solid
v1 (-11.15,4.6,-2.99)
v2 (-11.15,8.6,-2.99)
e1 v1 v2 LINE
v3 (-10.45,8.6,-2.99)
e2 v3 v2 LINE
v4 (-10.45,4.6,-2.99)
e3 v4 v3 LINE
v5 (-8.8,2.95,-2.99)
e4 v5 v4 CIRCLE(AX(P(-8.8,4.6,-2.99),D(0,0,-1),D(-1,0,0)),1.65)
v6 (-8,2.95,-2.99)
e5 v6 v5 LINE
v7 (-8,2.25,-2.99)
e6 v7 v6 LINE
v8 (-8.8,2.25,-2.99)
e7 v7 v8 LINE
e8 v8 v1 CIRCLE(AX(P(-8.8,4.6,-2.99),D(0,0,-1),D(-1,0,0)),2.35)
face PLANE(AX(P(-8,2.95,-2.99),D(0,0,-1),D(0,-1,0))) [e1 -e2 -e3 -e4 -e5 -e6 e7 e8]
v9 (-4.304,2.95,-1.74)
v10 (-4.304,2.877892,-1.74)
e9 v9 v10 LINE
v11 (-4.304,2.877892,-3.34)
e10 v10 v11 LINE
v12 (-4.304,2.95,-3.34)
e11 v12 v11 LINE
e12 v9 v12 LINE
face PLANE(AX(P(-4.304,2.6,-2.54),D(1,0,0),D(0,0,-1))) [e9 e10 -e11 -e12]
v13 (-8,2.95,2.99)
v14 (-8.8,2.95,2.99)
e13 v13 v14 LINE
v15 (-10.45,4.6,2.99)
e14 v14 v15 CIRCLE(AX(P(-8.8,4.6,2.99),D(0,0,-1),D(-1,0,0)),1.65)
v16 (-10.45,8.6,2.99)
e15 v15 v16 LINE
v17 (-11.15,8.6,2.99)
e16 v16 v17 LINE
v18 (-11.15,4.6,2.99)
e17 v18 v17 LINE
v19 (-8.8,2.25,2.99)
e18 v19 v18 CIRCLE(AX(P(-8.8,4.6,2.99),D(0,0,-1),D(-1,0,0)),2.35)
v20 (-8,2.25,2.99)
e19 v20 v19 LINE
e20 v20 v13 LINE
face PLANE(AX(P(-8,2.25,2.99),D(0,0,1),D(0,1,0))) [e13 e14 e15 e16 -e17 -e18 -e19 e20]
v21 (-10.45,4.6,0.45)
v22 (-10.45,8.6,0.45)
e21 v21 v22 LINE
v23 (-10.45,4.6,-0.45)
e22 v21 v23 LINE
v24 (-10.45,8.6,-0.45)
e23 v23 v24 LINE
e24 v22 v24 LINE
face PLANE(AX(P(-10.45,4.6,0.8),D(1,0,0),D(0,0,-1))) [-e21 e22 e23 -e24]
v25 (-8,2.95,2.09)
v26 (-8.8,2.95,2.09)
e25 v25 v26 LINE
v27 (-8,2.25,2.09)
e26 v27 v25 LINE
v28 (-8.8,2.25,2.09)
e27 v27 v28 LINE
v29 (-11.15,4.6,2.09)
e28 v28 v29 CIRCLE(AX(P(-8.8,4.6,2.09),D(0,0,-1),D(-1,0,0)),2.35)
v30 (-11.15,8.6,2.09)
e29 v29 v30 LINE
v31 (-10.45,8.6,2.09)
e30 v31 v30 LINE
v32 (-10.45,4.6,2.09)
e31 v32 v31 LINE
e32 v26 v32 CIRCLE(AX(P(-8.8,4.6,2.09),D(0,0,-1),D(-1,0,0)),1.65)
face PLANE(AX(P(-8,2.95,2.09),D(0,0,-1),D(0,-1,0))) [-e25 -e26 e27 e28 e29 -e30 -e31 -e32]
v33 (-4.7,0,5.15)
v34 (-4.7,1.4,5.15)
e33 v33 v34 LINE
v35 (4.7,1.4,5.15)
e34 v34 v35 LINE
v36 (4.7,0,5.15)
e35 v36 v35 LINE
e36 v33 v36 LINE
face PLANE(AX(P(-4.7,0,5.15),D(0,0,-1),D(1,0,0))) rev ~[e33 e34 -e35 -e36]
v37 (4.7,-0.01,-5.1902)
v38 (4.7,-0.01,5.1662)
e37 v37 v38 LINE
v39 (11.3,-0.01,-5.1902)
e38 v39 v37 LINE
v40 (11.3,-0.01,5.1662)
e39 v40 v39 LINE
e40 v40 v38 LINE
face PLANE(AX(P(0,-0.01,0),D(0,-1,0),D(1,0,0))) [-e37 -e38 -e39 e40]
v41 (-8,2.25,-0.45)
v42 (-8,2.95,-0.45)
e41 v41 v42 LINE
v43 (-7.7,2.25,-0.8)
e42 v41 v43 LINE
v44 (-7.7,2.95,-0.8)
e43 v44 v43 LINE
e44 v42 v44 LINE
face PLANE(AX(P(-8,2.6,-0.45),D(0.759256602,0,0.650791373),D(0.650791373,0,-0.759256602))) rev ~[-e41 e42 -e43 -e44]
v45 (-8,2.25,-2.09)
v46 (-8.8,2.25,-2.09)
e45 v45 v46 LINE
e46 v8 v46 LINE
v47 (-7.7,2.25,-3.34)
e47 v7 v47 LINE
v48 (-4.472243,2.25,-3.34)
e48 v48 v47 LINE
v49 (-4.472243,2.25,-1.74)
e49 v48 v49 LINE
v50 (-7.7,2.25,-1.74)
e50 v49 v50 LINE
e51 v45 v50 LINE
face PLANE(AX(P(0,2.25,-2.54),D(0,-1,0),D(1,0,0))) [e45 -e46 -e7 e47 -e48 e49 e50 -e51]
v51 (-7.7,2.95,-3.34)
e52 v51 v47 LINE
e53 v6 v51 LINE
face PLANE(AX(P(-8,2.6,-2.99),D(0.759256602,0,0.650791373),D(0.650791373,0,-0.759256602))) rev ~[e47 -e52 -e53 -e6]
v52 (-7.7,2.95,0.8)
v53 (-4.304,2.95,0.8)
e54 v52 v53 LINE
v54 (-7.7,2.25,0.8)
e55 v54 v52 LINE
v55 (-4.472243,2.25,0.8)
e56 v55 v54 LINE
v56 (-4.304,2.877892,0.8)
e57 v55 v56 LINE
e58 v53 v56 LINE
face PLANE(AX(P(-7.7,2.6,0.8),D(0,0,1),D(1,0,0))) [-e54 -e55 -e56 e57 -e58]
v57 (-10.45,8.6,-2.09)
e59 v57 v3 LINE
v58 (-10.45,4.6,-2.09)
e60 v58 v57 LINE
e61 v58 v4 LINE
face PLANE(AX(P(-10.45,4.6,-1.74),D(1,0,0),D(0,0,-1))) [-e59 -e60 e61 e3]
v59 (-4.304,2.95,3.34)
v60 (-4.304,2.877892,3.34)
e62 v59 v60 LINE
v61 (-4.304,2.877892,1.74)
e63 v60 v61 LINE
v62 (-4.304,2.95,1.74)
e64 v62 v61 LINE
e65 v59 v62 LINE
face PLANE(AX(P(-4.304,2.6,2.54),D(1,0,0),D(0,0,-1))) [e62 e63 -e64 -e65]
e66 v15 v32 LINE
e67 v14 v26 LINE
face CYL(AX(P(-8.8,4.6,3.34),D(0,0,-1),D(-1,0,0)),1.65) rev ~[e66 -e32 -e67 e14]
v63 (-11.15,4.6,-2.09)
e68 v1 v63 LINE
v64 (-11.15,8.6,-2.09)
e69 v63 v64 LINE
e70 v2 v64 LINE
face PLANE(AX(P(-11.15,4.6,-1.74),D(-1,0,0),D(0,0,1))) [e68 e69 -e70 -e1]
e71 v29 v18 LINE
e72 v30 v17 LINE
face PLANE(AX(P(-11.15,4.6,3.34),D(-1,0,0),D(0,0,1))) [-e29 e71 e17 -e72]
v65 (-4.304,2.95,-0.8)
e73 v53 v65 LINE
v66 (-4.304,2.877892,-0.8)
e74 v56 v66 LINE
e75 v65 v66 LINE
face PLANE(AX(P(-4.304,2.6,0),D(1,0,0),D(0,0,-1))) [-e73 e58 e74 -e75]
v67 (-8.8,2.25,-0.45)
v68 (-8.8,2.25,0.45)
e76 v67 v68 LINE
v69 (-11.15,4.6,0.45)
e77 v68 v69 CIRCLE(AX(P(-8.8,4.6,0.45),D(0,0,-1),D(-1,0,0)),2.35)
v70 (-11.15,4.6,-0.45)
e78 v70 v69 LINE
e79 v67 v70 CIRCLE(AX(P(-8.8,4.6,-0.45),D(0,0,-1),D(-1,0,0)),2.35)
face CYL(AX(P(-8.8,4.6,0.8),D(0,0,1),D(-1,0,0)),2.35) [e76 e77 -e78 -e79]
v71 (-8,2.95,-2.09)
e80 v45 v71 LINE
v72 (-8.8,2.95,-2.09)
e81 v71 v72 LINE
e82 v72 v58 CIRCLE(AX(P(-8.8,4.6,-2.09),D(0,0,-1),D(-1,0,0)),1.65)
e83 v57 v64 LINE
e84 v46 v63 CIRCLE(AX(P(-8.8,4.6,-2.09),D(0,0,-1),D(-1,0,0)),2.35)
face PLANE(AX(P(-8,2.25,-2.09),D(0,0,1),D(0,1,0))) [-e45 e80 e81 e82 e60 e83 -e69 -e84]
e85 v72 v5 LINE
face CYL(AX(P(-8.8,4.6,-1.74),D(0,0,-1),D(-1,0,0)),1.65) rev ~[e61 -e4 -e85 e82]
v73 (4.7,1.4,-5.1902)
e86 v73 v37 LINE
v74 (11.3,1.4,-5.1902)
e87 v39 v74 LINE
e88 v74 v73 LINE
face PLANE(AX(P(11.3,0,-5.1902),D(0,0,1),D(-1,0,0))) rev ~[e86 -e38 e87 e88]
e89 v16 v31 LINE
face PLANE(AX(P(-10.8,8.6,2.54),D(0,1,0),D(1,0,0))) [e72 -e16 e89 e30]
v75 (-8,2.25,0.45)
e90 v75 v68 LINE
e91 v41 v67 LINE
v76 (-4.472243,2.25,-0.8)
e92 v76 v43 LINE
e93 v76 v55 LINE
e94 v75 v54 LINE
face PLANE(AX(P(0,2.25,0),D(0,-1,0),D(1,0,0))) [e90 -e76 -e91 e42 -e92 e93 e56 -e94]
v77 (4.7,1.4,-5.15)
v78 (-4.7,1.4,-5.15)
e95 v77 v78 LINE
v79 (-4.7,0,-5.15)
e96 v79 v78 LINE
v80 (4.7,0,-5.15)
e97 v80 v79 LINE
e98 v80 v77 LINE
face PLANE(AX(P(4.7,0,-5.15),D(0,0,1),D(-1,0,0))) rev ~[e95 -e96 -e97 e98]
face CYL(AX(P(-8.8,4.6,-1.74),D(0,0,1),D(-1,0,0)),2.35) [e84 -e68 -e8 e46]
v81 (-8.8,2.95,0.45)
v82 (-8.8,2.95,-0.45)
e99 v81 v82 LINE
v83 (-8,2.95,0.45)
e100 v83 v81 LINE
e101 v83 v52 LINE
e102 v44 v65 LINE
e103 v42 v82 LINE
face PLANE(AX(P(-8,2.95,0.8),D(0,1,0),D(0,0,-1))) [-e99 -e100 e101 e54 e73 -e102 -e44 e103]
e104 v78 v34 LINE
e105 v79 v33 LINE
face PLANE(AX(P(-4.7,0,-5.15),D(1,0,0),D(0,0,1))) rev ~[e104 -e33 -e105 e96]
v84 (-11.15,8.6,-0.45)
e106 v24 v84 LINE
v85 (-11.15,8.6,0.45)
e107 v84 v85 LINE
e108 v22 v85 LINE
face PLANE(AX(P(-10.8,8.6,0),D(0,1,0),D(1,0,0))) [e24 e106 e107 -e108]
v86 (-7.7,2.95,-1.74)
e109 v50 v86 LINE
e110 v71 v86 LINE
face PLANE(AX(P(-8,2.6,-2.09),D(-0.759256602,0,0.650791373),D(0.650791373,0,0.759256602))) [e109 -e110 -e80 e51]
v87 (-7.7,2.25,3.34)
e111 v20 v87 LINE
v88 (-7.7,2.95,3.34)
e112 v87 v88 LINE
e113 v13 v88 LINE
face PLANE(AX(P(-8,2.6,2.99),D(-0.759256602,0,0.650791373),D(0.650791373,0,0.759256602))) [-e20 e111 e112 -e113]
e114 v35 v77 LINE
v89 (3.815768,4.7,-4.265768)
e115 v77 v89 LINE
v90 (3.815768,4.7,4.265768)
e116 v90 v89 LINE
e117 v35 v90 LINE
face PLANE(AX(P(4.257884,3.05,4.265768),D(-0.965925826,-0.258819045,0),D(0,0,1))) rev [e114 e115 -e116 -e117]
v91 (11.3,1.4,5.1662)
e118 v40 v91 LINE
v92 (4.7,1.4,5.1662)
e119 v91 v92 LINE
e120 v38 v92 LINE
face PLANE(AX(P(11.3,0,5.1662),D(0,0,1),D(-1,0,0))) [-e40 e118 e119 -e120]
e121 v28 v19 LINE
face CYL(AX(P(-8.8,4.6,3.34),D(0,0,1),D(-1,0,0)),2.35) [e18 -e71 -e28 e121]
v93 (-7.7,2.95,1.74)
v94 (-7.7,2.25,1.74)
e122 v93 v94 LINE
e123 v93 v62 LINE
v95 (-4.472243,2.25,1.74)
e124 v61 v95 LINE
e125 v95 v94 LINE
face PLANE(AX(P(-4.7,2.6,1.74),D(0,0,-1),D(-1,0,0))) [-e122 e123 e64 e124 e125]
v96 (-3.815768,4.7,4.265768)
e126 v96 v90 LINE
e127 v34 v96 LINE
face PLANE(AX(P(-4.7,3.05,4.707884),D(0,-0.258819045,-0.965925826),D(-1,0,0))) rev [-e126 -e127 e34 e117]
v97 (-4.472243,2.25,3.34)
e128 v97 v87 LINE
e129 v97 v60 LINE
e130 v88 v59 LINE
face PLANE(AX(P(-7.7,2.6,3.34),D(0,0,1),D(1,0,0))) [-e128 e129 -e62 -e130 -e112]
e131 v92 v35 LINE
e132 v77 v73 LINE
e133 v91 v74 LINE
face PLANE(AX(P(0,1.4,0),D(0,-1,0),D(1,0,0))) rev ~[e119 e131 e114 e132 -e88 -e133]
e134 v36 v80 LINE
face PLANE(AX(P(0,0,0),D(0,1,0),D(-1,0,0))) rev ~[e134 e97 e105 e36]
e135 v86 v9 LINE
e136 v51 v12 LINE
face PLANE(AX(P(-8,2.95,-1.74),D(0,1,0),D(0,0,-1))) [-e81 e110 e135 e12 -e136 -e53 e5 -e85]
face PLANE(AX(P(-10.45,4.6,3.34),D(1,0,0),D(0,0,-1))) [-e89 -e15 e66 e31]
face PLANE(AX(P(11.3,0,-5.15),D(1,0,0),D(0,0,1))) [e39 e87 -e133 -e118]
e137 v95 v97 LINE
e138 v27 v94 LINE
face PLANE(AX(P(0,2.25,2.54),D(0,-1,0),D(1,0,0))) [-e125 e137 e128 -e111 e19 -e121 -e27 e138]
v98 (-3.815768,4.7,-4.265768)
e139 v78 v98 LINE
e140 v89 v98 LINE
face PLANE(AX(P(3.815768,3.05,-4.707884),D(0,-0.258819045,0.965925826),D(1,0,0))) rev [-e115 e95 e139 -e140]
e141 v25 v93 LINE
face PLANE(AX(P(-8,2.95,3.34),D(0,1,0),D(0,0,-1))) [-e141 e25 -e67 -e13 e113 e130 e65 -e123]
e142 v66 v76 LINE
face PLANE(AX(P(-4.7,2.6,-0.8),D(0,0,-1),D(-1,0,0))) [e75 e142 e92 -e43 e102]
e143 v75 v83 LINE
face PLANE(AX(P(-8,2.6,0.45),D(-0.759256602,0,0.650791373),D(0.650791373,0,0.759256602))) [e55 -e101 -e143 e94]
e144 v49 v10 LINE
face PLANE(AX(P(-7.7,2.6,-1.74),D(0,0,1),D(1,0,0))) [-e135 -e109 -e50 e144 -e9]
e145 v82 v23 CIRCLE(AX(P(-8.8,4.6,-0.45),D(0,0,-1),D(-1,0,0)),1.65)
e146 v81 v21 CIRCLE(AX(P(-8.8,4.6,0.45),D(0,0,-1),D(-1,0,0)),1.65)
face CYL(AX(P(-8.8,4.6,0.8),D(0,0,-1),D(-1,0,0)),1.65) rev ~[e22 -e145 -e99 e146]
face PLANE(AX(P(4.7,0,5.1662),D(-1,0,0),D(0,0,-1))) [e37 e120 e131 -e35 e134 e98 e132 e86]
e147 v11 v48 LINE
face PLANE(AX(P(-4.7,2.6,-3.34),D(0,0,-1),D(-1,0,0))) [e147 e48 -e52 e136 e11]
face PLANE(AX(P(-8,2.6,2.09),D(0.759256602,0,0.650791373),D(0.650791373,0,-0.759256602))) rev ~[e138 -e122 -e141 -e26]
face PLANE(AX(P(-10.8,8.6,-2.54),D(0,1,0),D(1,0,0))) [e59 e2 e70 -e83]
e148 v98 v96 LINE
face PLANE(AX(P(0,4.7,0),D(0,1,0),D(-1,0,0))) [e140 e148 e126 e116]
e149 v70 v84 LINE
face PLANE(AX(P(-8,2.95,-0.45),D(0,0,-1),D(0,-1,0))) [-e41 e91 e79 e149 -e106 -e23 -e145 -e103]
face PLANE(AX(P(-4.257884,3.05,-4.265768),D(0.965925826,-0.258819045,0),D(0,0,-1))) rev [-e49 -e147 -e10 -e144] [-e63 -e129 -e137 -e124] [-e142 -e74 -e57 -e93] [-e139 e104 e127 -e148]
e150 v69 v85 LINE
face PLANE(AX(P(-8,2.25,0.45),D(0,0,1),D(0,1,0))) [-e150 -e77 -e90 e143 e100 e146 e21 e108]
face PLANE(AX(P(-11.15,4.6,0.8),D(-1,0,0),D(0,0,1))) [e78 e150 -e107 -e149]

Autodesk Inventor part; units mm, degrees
ref_plane "YZ Plane" through (0, 0, 0) normal (1, 0, 0) x (0, 1, 0)
ref_plane "XZ Plane" through (0, 0, 0) normal (0, 1, 0) x (-1, 0, 0)
sketch "Sketch1" plane through (0, 0, 0) normal (0, 1, 0) x (-1, 0, 0)
  line L0 (4.7, 5.15) -> (-4.7, 5.15)
  line L1 (-4.7, 5.15) -> (-4.7, -5.15)
  line L2 (-4.7, -5.15) -> (4.7, -5.15)
  line L3 (4.7, -5.15) -> (4.7, 5.15)
  point P0 (0, 0)
  dimension "d0" = 9.4
  dimension "d1" = 4.7
  dimension "d2" = 10.3
  dimension "d3" = 5.15
extrude "Extrusion1" add sketch "Sketch1" along normal blind 4.7
chamfer "Chamfer1" distance 3.3 angle 15 1 edges at (0, 4.7, 5.15) measured on face at (-1.5667, 1.5667, 5.15)
chamfer "Chamfer2" distance 3.3 angle 15 1 edges at (4.7, 4.7, -0.4421) measured on face at (4.7, 3.1333, -2.0114)
chamfer "Chamfer3" distance 3.3 angle 15 1 edges at (-0.4421, 4.7, -5.15) measured on face at (-1.8614, 3.1333, -5.15)
chamfer "Chamfer4" distance 3.3 angle 15 1 edges at (-4.7, 4.7, 0) measured on face at (-4.7, 2.5, -1.4219)
sketch "Sketch2" plane through (0, 0, 0) normal (0, -1, 0) x (1, 0, 0)
  line L0 (4.7, 5.15) -> (4.7, -5.15) projected
  line L1 (11.3, -5.15) -> (11.3, 5.1662)
  line L2 (11.3, 5.1662) -> (4.7, 5.1662)
  line L3 (4.7, 5.1662) -> (4.7, -5.15)
  line L4 (-4.7, 5.15) -> (4.7, 5.15) projected
  line L5 (11.3, -5.15) -> (11.3, -5.1902)
  line L6 (11.3, -5.1902) -> (4.7, -5.1902)
  line L7 (4.7, -5.1902) -> (4.7, -5.15)
  point P0 (0, 0)
  dimension "d18" = 6.6
extrude "Extrusion2" add sketch "Sketch2" against normal blind 1.4 and the other way blind 0.01
ref_plane "Work Plane1" through (0, 2.6, 0) normal (0, -1, 0) x (1, 0, 0)
sketch "Sketch3" plane through (0, 2.6, 0) normal (0, -1, 0) x (1, 0, 0)
  line L0 (-4.304, -0.8) -> (-8, -0.8)
  line L1 (-8, -0.8) -> (-8, 0.8)
  line L2 (-8, 0.8) -> (-4.304, 0.8)
  line L3 (-4.304, 0.8) -> (-4.304, -0.8)
  line L4 (-4.7, -5.15) -> (-4.7, 5.15) projected
  line L5 (-4.7, -5.15) -> (-4.7, 5.15) projected
  line L6 (-4.7, 0) -> (-3.1889, 0)
  line L7 (-8, -0.45) -> (-7.7, -0.8)
  line L8 (-8, 0.45) -> (-7.7, 0.8)
  point P0 (0, 0)
  dimension "d25" = 3.3
  dimension "d26" = 1.6
  dimension "d27" = 0.8
  dimension "d28" = 3
  dimension "d29" = 3
  dimension "d30" = 0.9
  dimension "d31" = 0.45
extrude "Extrusion3" add sketch "Sketch3" along normal mid plane 0.7 contours L7 L1 L8 L2 L4 L0 | L4 L6 L3 L0 | L4 L2 L3 L6
sketch "Sketch4" plane through (-8, 2.25, -0.45) normal (-1, 0, 0) x (0, 0, 1)
  line L0 (1.25, 0.7) -> (-0.35, 0.7) projected
  line L1 (1.25, 0) -> (-0.35, 0) projected
  line L2 (0.9, 0.7) -> (0, 0.7)
  line L3 (0, 0.7) -> (0, 0)
  line L4 (0, 0) -> (0.9, 0)
  line L5 (0.9, 0) -> (0.9, 0.7)
  line L6 (0.9, 0.7) -> (0.9, 0) projected
  line L7 (0.9, 0.126) -> (0.9, 0.1378)
  point P0 (0.45, -2.25)
  dimension "d34" = 0.9
  dimension "d35" = 0
sketch "Sketch5" plane through (0, 0, 0) normal (0, 0, 1) x (1, 0, 0)
  line L0 (-8, 2.95) -> (-8, 2.25) projected
  line L1 (-8, 2.6) -> (-8.8, 2.6)
  line L2 (-10.8, 4.6) -> (-10.8, 8.6)
  line L3 (-4.557, 8.6) -> (-13.8977, 8.6)
  line L4 (4.7, 0) -> (-4.7, 0) projected
  arc A0 (-10.8, 4.6) -> (-8.8, 2.6) centre (-8.8, 4.6) ccw
  point P0 (0, 0)
  dimension "d36" = 8.6
  dimension "d38" = 2.8
  dimension "d39" = 2
sweep "Sweep1" add profiles "Sketch4" path "Sketch5" path curves L1 A0 L2
pattern_linear "Rectangular Pattern1" count 3 spacing 2.54 along (0, 0, -1) of "Extrusion3", "Sweep1" first direction both ways yes
properties part number "TO-220_UnderHeat"
